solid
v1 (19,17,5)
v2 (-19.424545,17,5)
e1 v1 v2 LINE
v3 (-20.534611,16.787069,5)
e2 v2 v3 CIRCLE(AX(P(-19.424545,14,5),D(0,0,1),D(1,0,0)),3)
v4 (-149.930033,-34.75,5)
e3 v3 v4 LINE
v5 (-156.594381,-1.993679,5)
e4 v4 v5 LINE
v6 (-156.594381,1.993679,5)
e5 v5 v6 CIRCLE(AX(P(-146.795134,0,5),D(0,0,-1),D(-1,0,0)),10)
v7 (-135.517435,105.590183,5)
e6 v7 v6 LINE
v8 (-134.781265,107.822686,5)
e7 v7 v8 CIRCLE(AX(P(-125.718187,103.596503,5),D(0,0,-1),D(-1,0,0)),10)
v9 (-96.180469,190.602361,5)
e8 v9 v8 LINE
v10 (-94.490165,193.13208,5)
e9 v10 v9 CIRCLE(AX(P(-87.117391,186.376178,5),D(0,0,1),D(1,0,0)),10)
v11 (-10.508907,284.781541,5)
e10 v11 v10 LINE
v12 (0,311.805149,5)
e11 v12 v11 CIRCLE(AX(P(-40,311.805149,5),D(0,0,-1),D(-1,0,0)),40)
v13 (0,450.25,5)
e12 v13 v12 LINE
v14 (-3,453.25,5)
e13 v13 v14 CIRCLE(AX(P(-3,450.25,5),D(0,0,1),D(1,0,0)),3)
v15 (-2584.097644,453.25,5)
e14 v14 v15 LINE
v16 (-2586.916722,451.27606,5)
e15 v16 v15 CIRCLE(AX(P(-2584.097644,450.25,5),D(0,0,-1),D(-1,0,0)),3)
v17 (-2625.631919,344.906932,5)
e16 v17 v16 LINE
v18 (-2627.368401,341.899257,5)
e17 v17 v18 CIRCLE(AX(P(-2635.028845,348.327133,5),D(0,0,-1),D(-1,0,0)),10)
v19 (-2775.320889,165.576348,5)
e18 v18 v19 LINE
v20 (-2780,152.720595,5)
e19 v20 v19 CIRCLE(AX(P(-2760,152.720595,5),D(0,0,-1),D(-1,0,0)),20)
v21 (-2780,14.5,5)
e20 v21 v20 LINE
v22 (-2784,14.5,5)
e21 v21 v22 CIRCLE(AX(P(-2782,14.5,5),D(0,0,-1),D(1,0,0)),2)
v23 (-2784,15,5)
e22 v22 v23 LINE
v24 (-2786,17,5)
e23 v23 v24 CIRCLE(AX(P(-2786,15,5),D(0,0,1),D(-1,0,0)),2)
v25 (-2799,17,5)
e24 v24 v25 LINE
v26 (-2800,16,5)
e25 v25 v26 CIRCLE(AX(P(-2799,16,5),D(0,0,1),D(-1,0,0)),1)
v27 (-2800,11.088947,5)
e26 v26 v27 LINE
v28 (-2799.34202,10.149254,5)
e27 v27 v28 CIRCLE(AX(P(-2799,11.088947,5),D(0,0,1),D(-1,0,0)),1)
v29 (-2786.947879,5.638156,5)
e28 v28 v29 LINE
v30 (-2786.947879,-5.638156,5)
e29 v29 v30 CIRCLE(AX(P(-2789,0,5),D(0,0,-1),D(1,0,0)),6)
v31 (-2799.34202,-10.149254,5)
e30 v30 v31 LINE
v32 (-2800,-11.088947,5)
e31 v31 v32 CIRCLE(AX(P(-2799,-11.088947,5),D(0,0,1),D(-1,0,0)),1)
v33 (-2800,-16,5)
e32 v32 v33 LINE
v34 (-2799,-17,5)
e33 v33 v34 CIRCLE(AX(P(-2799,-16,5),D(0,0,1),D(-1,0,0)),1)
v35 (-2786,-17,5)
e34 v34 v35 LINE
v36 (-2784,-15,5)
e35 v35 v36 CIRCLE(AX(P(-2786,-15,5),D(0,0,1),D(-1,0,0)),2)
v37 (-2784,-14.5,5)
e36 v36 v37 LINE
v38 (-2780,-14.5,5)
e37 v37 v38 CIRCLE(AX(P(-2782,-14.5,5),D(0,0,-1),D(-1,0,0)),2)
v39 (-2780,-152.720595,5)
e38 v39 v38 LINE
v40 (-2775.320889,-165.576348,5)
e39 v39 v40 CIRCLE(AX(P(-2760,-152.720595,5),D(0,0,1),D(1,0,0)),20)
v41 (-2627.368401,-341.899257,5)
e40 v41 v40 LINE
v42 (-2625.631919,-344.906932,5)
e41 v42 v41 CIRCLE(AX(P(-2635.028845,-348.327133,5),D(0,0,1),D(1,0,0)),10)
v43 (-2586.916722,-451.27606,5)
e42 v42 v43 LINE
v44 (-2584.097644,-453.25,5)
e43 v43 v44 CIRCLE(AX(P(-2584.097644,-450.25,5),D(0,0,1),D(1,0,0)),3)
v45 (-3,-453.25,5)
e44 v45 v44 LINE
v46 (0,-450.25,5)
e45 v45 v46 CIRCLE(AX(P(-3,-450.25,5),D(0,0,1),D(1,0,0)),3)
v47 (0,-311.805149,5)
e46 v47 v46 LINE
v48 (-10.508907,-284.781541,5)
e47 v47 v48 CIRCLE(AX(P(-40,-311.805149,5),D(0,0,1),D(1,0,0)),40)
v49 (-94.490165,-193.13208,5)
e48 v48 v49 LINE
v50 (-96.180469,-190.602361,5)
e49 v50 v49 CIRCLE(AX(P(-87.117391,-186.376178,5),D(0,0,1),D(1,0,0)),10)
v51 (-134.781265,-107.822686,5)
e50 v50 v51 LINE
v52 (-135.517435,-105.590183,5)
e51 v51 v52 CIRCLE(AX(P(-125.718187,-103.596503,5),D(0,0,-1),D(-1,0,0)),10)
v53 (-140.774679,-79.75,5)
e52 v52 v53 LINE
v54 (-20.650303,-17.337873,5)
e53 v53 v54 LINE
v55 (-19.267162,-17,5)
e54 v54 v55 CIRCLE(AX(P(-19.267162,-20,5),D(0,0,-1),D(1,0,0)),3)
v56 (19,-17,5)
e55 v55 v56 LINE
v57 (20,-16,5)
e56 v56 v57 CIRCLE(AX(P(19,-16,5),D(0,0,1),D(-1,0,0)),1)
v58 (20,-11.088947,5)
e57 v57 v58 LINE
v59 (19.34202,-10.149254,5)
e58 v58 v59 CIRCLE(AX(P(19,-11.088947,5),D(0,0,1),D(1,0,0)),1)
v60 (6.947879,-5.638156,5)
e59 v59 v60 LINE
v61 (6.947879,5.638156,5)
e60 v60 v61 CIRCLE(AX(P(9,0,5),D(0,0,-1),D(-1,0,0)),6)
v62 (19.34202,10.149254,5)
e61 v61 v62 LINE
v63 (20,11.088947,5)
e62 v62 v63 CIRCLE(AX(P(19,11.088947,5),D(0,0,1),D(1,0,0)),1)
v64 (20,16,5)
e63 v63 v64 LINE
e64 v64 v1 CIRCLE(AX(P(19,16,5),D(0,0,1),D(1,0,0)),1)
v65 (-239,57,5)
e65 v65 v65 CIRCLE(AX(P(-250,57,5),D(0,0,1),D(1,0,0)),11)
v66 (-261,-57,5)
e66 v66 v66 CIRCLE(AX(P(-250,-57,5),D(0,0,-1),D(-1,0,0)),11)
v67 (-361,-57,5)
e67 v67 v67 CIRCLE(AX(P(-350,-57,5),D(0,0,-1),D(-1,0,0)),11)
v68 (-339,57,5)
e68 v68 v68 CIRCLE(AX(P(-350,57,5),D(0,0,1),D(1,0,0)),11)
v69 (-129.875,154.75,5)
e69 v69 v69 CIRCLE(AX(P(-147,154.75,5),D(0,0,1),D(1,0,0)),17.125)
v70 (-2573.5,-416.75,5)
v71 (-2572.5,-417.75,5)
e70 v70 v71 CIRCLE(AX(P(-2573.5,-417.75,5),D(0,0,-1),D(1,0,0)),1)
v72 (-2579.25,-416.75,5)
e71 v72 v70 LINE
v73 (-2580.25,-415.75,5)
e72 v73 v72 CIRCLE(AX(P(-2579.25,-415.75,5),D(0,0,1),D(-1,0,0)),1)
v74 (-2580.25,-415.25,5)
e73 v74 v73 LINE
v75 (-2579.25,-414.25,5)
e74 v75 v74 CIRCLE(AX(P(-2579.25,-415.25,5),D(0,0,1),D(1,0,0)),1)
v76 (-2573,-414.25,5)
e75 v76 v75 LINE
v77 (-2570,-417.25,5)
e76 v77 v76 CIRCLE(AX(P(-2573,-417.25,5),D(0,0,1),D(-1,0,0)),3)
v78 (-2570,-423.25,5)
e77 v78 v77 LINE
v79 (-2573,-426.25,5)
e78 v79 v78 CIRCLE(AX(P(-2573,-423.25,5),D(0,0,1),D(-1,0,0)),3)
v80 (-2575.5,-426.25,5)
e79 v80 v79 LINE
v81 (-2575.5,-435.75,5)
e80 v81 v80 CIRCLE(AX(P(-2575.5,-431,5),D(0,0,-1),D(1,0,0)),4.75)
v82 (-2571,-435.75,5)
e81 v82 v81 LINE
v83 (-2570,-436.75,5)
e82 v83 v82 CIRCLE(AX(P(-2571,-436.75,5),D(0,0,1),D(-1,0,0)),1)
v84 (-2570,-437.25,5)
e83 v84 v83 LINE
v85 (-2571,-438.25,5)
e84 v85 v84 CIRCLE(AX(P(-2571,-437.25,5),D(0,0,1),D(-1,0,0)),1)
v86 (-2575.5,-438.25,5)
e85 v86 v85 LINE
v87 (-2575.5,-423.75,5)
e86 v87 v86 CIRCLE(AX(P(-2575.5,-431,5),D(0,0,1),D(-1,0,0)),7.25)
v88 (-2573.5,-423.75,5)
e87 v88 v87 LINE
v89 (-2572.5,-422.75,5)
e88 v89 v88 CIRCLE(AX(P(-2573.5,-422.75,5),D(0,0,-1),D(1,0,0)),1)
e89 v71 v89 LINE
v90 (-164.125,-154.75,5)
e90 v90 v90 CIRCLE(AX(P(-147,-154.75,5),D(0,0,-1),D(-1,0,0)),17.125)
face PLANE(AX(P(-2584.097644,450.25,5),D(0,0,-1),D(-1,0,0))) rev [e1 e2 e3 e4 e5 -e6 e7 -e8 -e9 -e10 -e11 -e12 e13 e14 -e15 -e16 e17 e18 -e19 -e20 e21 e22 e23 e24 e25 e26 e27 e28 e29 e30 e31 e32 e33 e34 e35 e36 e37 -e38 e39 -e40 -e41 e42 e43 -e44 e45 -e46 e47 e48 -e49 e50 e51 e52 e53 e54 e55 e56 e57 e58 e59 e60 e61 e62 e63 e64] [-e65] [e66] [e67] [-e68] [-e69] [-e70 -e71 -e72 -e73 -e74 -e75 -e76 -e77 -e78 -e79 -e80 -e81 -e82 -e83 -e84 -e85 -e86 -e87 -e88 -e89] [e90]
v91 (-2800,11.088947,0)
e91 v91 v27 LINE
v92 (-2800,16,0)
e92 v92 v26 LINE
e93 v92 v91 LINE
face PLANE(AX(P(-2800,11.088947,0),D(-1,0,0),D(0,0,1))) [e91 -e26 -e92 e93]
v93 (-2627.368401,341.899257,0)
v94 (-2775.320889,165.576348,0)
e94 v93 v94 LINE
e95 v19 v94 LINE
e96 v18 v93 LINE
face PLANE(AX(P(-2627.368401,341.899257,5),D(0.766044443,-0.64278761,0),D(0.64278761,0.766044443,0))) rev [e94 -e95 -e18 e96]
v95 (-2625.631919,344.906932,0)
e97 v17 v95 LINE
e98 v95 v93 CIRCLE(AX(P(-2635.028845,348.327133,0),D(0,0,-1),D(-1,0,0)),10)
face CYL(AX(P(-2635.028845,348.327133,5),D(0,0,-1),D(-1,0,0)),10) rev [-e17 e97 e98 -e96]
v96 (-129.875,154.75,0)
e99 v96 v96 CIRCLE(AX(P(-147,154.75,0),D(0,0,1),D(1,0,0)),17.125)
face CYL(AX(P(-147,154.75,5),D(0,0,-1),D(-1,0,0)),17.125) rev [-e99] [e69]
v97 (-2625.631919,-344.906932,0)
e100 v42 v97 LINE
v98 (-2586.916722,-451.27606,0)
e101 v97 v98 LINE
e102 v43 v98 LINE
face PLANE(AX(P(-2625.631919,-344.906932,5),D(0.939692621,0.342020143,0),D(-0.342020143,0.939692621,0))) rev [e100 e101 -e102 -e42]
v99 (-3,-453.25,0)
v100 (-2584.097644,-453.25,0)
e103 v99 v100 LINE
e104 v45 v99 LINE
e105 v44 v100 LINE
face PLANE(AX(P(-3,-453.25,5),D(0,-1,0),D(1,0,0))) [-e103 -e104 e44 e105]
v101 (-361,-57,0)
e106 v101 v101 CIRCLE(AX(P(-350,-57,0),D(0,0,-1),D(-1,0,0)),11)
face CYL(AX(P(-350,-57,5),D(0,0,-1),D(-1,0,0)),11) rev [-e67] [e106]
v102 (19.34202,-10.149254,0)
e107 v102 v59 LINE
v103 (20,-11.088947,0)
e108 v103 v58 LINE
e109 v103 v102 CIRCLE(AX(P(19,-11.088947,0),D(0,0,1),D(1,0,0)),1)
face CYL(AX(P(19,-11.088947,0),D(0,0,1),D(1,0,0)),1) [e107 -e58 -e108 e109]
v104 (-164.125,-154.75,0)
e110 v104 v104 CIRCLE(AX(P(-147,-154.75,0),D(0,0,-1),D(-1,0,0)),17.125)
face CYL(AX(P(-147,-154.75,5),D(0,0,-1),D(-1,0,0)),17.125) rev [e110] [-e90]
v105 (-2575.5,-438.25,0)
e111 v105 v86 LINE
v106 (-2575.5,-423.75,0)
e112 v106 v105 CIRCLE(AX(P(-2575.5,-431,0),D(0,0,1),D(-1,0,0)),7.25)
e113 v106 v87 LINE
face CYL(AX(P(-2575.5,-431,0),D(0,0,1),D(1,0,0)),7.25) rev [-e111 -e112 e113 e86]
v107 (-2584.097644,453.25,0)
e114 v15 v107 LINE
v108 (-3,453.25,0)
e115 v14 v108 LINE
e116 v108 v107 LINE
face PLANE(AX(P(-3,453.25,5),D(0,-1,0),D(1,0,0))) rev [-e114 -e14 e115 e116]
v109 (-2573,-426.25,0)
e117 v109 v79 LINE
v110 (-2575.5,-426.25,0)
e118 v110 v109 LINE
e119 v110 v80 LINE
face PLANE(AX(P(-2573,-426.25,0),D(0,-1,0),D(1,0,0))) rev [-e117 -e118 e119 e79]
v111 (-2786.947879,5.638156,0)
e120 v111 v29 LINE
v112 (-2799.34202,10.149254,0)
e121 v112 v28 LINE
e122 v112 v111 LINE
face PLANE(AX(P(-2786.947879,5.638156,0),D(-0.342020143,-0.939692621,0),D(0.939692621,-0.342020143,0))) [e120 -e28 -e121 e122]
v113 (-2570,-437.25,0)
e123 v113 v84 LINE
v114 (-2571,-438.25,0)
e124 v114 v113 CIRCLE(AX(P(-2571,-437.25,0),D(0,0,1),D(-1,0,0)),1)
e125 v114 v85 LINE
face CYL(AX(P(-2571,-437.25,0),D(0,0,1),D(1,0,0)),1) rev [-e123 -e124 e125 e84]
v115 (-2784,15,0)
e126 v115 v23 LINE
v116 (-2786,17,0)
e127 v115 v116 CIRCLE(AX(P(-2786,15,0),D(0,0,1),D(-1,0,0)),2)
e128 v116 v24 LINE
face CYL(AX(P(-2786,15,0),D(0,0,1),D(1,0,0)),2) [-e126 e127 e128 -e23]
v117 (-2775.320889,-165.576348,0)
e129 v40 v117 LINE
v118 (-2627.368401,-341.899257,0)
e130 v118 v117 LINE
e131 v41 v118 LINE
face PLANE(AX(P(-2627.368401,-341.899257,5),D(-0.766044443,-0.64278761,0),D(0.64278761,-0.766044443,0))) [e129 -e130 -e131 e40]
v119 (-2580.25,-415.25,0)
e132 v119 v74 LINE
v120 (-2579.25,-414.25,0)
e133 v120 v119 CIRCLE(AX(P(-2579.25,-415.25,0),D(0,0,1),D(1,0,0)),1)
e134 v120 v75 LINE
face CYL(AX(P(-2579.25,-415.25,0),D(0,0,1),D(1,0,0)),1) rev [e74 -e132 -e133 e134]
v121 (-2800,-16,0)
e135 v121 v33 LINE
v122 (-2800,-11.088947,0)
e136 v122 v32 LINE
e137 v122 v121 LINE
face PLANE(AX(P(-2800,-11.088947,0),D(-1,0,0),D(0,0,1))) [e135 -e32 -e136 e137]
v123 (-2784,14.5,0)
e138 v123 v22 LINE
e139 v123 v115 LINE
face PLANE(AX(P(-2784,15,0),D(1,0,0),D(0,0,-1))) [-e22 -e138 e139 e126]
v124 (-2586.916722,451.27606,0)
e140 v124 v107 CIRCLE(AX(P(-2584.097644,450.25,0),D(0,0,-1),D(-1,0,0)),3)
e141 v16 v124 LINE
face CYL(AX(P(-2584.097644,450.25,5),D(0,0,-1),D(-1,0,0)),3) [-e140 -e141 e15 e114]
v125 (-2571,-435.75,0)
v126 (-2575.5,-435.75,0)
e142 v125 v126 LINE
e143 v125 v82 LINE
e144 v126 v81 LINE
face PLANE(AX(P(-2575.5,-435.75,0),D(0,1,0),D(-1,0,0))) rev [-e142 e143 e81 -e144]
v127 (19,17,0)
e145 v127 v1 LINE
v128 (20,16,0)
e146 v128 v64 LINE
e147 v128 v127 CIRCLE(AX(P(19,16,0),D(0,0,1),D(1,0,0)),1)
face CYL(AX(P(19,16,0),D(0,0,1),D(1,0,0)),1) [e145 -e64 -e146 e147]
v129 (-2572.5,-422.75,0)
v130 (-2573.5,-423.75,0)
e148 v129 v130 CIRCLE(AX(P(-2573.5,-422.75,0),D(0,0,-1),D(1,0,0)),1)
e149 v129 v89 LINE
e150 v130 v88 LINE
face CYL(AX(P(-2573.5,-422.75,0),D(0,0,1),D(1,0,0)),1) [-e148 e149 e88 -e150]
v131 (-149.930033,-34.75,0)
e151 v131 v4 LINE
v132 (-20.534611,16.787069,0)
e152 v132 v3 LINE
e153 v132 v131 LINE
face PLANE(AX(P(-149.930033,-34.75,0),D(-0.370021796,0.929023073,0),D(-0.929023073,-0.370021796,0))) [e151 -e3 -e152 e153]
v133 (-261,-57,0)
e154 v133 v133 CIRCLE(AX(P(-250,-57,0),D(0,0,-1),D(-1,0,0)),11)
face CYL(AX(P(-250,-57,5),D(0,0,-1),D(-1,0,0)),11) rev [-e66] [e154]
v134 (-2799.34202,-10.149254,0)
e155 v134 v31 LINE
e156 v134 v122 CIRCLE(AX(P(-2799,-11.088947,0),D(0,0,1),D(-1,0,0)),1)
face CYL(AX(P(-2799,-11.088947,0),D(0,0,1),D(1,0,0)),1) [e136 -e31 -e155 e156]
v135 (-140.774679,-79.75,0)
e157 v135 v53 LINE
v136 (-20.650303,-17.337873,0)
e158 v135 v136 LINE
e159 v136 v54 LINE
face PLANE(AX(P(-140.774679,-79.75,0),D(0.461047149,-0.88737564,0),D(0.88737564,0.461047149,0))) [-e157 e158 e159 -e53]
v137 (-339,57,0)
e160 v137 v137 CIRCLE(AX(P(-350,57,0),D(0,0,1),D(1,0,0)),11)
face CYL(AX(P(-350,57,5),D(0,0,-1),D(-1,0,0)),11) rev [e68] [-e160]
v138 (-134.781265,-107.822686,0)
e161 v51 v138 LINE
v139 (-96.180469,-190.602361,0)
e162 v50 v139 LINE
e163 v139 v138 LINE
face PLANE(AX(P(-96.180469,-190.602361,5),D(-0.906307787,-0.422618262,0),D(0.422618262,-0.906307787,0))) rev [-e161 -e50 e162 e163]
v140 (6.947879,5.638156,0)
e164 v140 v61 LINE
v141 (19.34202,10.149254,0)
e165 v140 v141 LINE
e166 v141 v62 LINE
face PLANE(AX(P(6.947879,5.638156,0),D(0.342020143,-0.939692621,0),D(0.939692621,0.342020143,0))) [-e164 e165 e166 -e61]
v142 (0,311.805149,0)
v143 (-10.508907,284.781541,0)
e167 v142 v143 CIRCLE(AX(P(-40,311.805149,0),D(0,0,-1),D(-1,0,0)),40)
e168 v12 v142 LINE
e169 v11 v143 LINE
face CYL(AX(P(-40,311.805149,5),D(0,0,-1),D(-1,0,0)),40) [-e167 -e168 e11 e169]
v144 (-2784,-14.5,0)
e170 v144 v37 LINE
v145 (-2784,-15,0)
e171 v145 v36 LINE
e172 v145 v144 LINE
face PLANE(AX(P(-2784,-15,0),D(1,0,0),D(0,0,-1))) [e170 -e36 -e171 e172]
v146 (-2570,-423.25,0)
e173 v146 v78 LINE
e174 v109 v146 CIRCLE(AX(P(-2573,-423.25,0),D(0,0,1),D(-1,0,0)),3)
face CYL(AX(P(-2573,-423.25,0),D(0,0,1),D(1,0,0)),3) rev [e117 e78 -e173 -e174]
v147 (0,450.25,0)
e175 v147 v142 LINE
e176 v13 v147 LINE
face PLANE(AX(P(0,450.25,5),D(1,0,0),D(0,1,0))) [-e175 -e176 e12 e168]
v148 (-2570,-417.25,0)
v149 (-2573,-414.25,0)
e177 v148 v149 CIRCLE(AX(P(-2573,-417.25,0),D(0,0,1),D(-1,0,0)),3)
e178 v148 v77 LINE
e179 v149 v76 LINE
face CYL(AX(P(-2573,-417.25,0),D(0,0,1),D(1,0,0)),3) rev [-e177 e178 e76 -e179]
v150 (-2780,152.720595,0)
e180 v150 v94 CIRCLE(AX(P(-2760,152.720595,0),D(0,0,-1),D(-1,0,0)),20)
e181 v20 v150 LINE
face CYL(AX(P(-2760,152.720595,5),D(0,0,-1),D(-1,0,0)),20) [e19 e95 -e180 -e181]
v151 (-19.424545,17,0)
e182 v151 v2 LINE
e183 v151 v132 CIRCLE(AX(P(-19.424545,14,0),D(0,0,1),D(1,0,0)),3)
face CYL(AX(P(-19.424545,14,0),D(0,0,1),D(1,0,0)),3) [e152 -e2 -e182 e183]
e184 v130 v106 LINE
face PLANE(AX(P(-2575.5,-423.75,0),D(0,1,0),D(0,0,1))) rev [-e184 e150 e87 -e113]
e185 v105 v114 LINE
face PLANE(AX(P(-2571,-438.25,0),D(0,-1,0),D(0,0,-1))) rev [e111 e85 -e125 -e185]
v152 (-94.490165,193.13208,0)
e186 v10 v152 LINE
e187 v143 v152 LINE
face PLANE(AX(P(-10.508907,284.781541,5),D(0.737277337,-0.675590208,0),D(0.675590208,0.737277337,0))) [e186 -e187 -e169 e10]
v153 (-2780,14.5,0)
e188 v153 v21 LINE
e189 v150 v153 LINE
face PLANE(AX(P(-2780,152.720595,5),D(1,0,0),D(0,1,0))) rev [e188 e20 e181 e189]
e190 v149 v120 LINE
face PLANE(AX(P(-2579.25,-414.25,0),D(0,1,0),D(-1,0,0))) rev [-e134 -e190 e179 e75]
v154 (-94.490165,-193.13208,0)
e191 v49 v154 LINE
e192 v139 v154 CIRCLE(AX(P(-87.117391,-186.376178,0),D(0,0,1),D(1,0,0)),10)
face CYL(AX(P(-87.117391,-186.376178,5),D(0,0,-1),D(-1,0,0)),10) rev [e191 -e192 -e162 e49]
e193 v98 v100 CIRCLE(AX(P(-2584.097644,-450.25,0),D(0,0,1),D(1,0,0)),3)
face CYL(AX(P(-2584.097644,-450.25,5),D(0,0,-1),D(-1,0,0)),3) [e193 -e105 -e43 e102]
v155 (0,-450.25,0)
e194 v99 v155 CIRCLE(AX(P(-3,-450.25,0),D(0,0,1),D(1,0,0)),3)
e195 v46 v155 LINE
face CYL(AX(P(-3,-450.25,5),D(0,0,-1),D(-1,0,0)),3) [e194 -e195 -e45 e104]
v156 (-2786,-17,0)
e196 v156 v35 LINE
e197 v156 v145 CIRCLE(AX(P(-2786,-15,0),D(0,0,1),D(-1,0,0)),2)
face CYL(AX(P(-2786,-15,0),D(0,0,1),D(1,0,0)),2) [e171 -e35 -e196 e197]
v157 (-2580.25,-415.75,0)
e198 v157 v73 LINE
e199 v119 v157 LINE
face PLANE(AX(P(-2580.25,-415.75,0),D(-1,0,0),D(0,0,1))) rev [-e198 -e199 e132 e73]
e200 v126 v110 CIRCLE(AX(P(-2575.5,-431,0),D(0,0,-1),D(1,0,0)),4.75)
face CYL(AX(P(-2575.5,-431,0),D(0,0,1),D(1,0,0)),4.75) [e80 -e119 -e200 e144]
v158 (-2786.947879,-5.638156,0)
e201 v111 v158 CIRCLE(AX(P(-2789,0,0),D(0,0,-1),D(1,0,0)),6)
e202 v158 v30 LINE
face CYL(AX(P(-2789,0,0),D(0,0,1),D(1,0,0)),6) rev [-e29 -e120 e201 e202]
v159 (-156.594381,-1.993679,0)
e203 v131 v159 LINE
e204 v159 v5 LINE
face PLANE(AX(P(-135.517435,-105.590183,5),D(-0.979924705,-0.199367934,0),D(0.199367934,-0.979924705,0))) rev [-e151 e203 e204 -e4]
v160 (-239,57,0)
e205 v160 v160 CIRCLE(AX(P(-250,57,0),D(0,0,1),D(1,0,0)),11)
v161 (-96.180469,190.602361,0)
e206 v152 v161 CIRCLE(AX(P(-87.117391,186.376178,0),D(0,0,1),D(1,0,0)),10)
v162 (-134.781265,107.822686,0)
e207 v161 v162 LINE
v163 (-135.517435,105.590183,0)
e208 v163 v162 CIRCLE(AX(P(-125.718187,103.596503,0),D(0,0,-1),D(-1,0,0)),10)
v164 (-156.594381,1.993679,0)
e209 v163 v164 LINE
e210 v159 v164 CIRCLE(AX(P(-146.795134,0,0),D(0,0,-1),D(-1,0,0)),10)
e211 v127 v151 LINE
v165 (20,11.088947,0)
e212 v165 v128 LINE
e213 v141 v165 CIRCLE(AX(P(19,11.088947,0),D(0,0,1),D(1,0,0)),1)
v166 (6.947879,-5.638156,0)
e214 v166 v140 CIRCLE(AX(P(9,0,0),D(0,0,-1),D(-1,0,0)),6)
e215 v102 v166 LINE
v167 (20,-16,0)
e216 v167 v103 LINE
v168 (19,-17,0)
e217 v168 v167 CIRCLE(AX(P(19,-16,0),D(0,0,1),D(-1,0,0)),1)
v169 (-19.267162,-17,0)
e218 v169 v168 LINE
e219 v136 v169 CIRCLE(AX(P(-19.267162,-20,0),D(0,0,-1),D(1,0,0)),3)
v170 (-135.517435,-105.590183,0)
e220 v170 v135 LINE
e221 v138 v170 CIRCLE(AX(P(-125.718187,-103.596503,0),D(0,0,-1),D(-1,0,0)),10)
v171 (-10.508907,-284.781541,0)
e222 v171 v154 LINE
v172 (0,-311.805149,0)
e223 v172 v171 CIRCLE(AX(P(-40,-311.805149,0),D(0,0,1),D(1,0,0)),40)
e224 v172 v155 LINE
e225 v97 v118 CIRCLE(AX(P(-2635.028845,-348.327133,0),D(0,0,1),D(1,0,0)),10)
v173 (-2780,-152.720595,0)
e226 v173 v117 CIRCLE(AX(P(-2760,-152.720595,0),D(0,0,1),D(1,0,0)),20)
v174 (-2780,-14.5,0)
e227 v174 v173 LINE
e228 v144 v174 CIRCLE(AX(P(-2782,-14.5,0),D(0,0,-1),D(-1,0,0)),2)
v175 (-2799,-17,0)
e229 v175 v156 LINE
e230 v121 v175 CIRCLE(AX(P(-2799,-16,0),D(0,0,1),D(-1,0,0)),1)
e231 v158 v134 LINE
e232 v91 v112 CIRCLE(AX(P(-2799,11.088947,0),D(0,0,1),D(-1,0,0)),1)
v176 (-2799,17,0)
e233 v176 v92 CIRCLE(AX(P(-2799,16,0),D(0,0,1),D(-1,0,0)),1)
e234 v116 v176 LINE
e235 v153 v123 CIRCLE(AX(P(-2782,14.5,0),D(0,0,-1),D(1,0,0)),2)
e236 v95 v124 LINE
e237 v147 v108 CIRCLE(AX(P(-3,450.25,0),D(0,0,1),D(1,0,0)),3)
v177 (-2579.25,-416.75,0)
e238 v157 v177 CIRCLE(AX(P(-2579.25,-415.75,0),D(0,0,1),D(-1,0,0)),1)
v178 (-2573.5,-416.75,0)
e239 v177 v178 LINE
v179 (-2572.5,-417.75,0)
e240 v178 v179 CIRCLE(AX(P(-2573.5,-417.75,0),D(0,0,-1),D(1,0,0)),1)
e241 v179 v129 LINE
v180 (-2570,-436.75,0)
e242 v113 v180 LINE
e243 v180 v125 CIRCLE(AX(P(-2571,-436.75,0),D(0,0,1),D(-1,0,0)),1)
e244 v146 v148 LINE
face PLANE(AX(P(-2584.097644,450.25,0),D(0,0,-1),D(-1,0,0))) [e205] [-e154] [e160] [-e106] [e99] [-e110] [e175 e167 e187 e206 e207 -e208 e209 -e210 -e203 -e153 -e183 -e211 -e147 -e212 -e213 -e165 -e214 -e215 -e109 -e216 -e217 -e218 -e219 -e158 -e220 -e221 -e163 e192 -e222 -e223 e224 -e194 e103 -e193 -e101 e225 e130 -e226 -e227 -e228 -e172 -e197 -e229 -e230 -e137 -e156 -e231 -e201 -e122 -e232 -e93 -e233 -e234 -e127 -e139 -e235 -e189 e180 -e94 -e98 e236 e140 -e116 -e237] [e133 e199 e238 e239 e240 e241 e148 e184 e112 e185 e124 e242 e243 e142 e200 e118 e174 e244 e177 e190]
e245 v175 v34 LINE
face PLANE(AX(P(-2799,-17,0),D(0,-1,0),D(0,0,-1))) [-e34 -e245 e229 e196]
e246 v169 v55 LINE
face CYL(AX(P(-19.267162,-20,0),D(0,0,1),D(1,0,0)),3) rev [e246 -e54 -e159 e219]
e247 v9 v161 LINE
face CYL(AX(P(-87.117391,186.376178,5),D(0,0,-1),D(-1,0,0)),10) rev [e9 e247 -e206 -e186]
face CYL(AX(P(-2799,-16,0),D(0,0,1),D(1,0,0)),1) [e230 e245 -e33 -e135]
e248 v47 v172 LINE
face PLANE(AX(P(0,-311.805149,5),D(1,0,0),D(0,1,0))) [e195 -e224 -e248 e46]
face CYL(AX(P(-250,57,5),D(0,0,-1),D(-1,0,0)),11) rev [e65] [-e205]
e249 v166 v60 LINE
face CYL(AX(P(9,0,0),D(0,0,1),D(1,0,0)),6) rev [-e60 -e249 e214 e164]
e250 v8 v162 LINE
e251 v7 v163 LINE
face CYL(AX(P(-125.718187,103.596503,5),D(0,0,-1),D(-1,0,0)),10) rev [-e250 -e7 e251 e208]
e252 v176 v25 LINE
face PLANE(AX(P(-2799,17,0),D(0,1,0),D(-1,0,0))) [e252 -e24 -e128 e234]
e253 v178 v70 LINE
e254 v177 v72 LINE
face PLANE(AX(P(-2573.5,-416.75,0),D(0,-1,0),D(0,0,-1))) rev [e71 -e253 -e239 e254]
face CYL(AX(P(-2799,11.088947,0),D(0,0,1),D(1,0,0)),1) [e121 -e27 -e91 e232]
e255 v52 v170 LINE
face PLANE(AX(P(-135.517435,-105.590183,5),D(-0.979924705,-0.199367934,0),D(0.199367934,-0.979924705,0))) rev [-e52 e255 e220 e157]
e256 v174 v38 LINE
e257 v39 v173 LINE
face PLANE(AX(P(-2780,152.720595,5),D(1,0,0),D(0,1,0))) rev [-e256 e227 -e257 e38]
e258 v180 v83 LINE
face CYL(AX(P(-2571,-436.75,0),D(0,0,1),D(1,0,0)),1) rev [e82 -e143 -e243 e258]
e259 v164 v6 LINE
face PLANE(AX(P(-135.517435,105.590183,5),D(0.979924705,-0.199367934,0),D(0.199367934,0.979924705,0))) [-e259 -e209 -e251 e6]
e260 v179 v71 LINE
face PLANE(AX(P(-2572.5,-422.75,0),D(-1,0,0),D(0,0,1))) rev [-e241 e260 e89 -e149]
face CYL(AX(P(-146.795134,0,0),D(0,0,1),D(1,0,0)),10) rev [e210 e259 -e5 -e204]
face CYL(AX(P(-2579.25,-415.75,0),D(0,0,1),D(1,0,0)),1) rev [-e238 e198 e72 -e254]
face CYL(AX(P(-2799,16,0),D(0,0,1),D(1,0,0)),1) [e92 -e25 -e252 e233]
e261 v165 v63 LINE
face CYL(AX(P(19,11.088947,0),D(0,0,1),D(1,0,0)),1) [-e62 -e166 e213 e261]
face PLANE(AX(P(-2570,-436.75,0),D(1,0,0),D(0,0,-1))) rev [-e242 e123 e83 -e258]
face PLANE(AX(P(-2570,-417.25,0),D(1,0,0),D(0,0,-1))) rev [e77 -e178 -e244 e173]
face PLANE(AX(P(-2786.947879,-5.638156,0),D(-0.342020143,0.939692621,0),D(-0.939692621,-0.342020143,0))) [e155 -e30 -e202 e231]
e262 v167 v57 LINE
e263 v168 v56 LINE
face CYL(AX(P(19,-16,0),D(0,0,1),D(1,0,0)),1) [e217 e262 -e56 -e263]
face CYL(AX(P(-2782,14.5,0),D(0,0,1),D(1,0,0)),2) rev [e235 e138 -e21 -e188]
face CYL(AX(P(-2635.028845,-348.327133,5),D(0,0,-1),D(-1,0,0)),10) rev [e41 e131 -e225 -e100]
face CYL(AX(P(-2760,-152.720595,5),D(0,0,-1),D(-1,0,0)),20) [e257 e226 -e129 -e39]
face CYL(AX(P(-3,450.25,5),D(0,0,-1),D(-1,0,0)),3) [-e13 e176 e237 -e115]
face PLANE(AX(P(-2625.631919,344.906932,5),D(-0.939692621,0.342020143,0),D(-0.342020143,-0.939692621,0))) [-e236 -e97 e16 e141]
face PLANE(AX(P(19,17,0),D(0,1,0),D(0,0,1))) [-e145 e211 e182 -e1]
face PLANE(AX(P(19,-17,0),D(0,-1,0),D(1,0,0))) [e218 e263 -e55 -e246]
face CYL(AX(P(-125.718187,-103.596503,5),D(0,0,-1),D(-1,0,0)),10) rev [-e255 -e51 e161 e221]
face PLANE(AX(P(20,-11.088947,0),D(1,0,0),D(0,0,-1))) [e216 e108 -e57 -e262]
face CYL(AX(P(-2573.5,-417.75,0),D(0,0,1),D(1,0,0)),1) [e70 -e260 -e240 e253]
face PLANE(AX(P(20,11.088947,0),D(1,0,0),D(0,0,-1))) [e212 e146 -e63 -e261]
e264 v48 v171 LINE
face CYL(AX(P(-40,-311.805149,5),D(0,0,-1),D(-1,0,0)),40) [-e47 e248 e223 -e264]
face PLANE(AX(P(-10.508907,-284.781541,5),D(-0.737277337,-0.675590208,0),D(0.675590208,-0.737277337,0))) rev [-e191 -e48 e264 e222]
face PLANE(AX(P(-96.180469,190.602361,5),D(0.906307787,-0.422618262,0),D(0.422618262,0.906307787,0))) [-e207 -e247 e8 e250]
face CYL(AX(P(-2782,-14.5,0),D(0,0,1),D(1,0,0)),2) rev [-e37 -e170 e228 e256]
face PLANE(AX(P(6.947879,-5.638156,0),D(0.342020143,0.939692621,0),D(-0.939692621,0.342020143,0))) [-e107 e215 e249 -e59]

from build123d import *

# Parameters (mm, degrees)
SKETCH1_R                      = 17.125
SKETCH1_R_2                    = 11
BASE_EXTRUDE_DEPTH             = 5
SK_RET_5_TAL_DEPTH             = 2837.452108268
SKETCH2_OUTSIDE_W              = 3414.424
SKETCH2_OUTSIDE_H              = 1500.924
BORTSK_RING_AF_BUKKESTOP_DEPTH = 5
BUKKESTOP_FARINA_DEPTH         = 5


with BuildPart() as part:
    # Sketch1 → Base-Extrude (new body)
    with BuildSketch(Plane.XY):
        with BuildLine():
            Line((0, 450.25), (0, 311.805149274))
            ThreePointArc((0, 311.805149274), (-2.719685229, 297.307627743), (-10.508906528, 284.781540969))
            Line((-10.508906528, 284.781540969), (-94.490164622, 193.132080081))
            ThreePointArc((-94.490164622, 193.132080081), (-95.432087377, 191.931880335), (-96.180469124, 190.602360622))
            Line((-96.180469124, 190.602360622), (-134.781265361, 107.822685955))
            ThreePointArc((-134.781265361, 107.822685955), (-135.215178753, 106.728141402), (-135.517434537, 105.590182681))
            Line((-135.517434537, 105.590182681), (-154.559858359, 11.993679344))
            ThreePointArc((-154.559858359, 11.993679344), (-152.504537753, 3.672946714), (-144.760611313, 0))
            Line((-144.760611313, 0), (17, 0))
            ThreePointArc((17, 0), (19.121320344, -0.878679656), (20, -3))
            Line((20, -3), (20, -17.334351162))
            ThreePointArc((20, -17.334351162), (19.242605724, -19.327017609), (17.352853621, -20.313527948))
            Line((17.352853621, -20.313527948), (-148.861908023, -40))
            Line((-148.861908023, -40), (-135.517434537, -105.590182681))
            ThreePointArc((-135.517434537, -105.590182681), (-135.215178753, -106.728141402), (-134.781265361, -107.822685955))
            Line((-134.781265361, -107.822685955), (-96.180469124, -190.602360622))
            ThreePointArc((-96.180469124, -190.602360622), (-95.432087377, -191.931880335), (-94.490164622, -193.132080081))
            Line((-94.490164622, -193.132080081), (-10.508906528, -284.781540969))
            ThreePointArc((-10.508906528, -284.781540969), (-2.719685229, -297.307627743), (0, -311.805149274))
            Line((0, -311.805149274), (0, -450.25))
            ThreePointArc((0, -450.25), (-0.878679656, -452.371320344), (-3, -453.25))
            Line((-3, -453.25), (-2584.097644203, -453.25))
            ThreePointArc((-2584.097644203, -453.25), (-2585.818373512, -452.707456133), (-2586.916722065, -451.27606043))
            Line((-2586.916722065, -451.27606043), (-2625.631918795, -344.906931626))
            ThreePointArc((-2625.631918795, -344.906931626), (-2626.368590965, -343.327133059), (-2627.368400571, -341.899256963))
            Line((-2627.368400571, -341.899256963), (-2775.320888862, -165.576347508))
            ThreePointArc((-2775.320888862, -165.576347508), (-2778.793852416, -159.560998181), (-2780, -152.720595315))
            Line((-2780, -152.720595315), (-2780, -22.342329219))
            ThreePointArc((-2780, -22.342329219), (-2780.635383686, -20.496092591), (-2782.272393125, -19.431901719))
            Line((-2782.272393125, -19.431901719), (-2797.727606875, -15.568098281))
            ThreePointArc((-2797.727606875, -15.568098281), (-2799.364616314, -14.503907409), (-2800, -12.657670781))
            Line((-2800, -12.657670781), (-2800, -3))
            ThreePointArc((-2800, -3), (-2799.121320344, -0.878679656), (-2797, 0))
            Line((-2797, 0), (-2792.062257748, 0))
            ThreePointArc((-2792.062257748, 0), (-2789.427026365, -0.750817072), (-2787.583225666, -2.777777778))
            ThreePointArc((-2787.583225666, -2.777777778), (-2783.087011135, -4.894412835), (-2780, -1))
            Line((-2780, -1), (-2780, 0))
            Line((-2780, 0), (-2780, 152.720595315))
            ThreePointArc((-2780, 152.720595315), (-2778.793852416, 159.560998181), (-2775.320888862, 165.576347508))
            Line((-2775.320888862, 165.576347508), (-2627.368400571, 341.899256963))
            ThreePointArc((-2627.368400571, 341.899256963), (-2626.368590965, 343.327133059), (-2625.631918795, 344.906931626))
            Line((-2625.631918795, 344.906931626), (-2586.916722065, 451.27606043))
            ThreePointArc((-2586.916722065, 451.27606043), (-2585.818373512, 452.707456133), (-2584.097644203, 453.25))
            Line((-2584.097644203, 453.25), (-3, 453.25))
            ThreePointArc((-3, 453.25), (-0.878679656, 452.371320344), (0, 450.25))
        make_face()
        with Locations((-147, 154.75)):
            Circle(SKETCH1_R, mode=Mode.SUBTRACT)
        with Locations(Location((-147, -154.75, 0), (0, 0, 180))):
            Circle(SKETCH1_R, mode=Mode.SUBTRACT)
        with Locations((-250, 57)):
            Circle(SKETCH1_R_2, mode=Mode.SUBTRACT)
        with Locations((-350, 57)):
            Circle(SKETCH1_R_2, mode=Mode.SUBTRACT)
        with Locations(Location((-250, -57, 0), (0, 0, 180))):
            Circle(SKETCH1_R_2, mode=Mode.SUBTRACT)
        with Locations(Location((-350, -57, 0), (0, 0, 180))):
            Circle(SKETCH1_R_2, mode=Mode.SUBTRACT)
    extrude(amount=BASE_EXTRUDE_DEPTH)

    # Sketch5 → Skåret 5 tal (cut, through all)
    with BuildSketch(Plane.XY.offset(5)):
        with BuildLine():
            Line((-2579.25, -414.25), (-2573, -414.25))
            ThreePointArc((-2573, -414.25), (-2570.878679656, -415.128679656), (-2570, -417.25))
            Line((-2570, -417.25), (-2570, -423.25))
            ThreePointArc((-2570, -423.25), (-2570.878679656, -425.371320344), (-2573, -426.25))
            Line((-2573, -426.25), (-2575.5, -426.25))
            ThreePointArc((-2575.5, -426.25), (-2580.25, -431), (-2575.5, -435.75))
            Line((-2575.5, -435.75), (-2571, -435.75))
            ThreePointArc((-2571, -435.75), (-2570.292893219, -436.042893219), (-2570, -436.75))
            Line((-2570, -436.75), (-2570, -437.25))
            ThreePointArc((-2570, -437.25), (-2570.292893219, -437.957106781), (-2571, -438.25))
            Line((-2571, -438.25), (-2575.5, -438.25))
            ThreePointArc((-2575.5, -438.25), (-2582.75, -431), (-2575.5, -423.75))
            Line((-2575.5, -423.75), (-2573.5, -423.75))
            ThreePointArc((-2573.5, -423.75), (-2572.792893219, -423.457106781), (-2572.5, -422.75))
            Line((-2572.5, -422.75), (-2572.5, -417.75))
            ThreePointArc((-2572.5, -417.75), (-2572.792893219, -417.042893219), (-2573.5, -416.75))
            Line((-2573.5, -416.75), (-2579.25, -416.75))
            ThreePointArc((-2579.25, -416.75), (-2579.957106781, -416.457106781), (-2580.25, -415.75))
            Line((-2580.25, -415.75), (-2580.25, -415.25))
            ThreePointArc((-2580.25, -415.25), (-2579.957106781, -414.542893219), (-2579.25, -414.25))
        make_face()
    extrude(amount=-SK_RET_5_TAL_DEPTH, mode=Mode.SUBTRACT)

    # Sketch2 outside → Bortskæring af bukkestop (cut)
    with BuildSketch(Plane.XY.offset(5)):
        with Locations((-1390, 0)):
            Rectangle(SKETCH2_OUTSIDE_W, SKETCH2_OUTSIDE_H)
        with BuildLine():
            Line((0, -453.25), (-2780, -453.25))
            Line((-2780, -453.25), (-2780, 453.25))
            Line((-2780, 453.25), (0, 453.25))
            Line((0, 453.25), (0, 58.791931013))
            Line((0, 58.791931013), (-145.038646448, 58.791931013))
            Line((-145.038646448, 58.791931013), (-156.594381353, 1.993679344))
            ThreePointArc((-156.594381353, 1.993679344), (-156.795134307, 0), (-156.594381353, -1.993679344))
            Line((-156.594381353, -1.993679344), (-145.038646448, -58.791931013))
            Line((-145.038646448, -58.791931013), (0, -58.791931013))
            Line((0, -58.791931013), (0, -453.25))
        make_face(mode=Mode.SUBTRACT)
    extrude(amount=-BORTSK_RING_AF_BUKKESTOP_DEPTH, mode=Mode.SUBTRACT)

    # Sketch6 → Bukkestop - Farina (add)
    with BuildSketch(Plane.XY.offset(5)):
        with BuildLine():
            Line((-2786.94787914, 5.638155725), (-2799.342020143, 10.149254129))
            ThreePointArc((-2799.342020143, 10.149254129), (-2799.819152044, 10.515370314), (-2800, 11.08894675))
            Line((-2800, 11.08894675), (-2800, 16))
            ThreePointArc((-2800, 16), (-2799.707106781, 16.707106781), (-2799, 17))
            Line((-2799, 17), (-2786, 17))
            ThreePointArc((-2786, 17), (-2784.585786438, 16.414213562), (-2784, 15))
            Line((-2784, 15), (-2784, 14.5))
            ThreePointArc((-2784, 14.5), (-2782, 12.5), (-2780, 14.5))
            Line((-2780, 14.5), (-2780, -14.5))
            ThreePointArc((-2780, -14.5), (-2782, -12.5), (-2784, -14.5))
            Line((-2784, -14.5), (-2784, -15))
            ThreePointArc((-2784, -15), (-2784.585786438, -16.414213562), (-2786, -17))
            Line((-2786, -17), (-2799, -17))
            ThreePointArc((-2799, -17), (-2799.707106781, -16.707106781), (-2800, -16))
            Line((-2800, -16), (-2800, -11.08894675))
            ThreePointArc((-2800, -11.08894675), (-2799.819152044, -10.515370314), (-2799.342020143, -10.149254129))
            Line((-2799.342020143, -10.149254129), (-2786.94787914, -5.638155725))
            ThreePointArc((-2786.94787914, -5.638155725), (-2783, 0), (-2786.94787914, 5.638155725))
        make_face()
        with BuildLine():
            Line((6.94787914, 5.638155725), (19.342020143, 10.149254129))
            ThreePointArc((19.342020143, 10.149254129), (19.819152044, 10.515370314), (20, 11.08894675))
            Line((20, 11.08894675), (20, 16))
            ThreePointArc((20, 16), (19.707106781, 16.707106781), (19, 17))
            Line((19, 17), (-19.424545303, 17))
            ThreePointArc((-19.424545303, 17), (-19.989696761, 16.946286447), (-20.534610691, 16.787069219))
            Line((-20.534610691, 16.787069219), (-149.930032595, -34.75))
            Line((-149.930032595, -34.75), (-140.774679121, -79.75))
            Line((-140.774679121, -79.75), (-20.650302992, -17.337873079))
            ThreePointArc((-20.650302992, -17.337873079), (-19.979067171, -17.085692127), (-19.267161546, -17))
            Line((-19.267161546, -17), (19, -17))
            ThreePointArc((19, -17), (19.707106781, -16.707106781), (20, -16))
            Line((20, -16), (20, -11.08894675))
            ThreePointArc((20, -11.08894675), (19.819152044, -10.515370314), (19.342020143, -10.149254129))
            Line((19.342020143, -10.149254129), (6.94787914, -5.638155725))
            ThreePointArc((6.94787914, -5.638155725), (3, 0), (6.94787914, 5.638155725))
        make_face()
    extrude(amount=-BUKKESTOP_FARINA_DEPTH)


solid = part.part
